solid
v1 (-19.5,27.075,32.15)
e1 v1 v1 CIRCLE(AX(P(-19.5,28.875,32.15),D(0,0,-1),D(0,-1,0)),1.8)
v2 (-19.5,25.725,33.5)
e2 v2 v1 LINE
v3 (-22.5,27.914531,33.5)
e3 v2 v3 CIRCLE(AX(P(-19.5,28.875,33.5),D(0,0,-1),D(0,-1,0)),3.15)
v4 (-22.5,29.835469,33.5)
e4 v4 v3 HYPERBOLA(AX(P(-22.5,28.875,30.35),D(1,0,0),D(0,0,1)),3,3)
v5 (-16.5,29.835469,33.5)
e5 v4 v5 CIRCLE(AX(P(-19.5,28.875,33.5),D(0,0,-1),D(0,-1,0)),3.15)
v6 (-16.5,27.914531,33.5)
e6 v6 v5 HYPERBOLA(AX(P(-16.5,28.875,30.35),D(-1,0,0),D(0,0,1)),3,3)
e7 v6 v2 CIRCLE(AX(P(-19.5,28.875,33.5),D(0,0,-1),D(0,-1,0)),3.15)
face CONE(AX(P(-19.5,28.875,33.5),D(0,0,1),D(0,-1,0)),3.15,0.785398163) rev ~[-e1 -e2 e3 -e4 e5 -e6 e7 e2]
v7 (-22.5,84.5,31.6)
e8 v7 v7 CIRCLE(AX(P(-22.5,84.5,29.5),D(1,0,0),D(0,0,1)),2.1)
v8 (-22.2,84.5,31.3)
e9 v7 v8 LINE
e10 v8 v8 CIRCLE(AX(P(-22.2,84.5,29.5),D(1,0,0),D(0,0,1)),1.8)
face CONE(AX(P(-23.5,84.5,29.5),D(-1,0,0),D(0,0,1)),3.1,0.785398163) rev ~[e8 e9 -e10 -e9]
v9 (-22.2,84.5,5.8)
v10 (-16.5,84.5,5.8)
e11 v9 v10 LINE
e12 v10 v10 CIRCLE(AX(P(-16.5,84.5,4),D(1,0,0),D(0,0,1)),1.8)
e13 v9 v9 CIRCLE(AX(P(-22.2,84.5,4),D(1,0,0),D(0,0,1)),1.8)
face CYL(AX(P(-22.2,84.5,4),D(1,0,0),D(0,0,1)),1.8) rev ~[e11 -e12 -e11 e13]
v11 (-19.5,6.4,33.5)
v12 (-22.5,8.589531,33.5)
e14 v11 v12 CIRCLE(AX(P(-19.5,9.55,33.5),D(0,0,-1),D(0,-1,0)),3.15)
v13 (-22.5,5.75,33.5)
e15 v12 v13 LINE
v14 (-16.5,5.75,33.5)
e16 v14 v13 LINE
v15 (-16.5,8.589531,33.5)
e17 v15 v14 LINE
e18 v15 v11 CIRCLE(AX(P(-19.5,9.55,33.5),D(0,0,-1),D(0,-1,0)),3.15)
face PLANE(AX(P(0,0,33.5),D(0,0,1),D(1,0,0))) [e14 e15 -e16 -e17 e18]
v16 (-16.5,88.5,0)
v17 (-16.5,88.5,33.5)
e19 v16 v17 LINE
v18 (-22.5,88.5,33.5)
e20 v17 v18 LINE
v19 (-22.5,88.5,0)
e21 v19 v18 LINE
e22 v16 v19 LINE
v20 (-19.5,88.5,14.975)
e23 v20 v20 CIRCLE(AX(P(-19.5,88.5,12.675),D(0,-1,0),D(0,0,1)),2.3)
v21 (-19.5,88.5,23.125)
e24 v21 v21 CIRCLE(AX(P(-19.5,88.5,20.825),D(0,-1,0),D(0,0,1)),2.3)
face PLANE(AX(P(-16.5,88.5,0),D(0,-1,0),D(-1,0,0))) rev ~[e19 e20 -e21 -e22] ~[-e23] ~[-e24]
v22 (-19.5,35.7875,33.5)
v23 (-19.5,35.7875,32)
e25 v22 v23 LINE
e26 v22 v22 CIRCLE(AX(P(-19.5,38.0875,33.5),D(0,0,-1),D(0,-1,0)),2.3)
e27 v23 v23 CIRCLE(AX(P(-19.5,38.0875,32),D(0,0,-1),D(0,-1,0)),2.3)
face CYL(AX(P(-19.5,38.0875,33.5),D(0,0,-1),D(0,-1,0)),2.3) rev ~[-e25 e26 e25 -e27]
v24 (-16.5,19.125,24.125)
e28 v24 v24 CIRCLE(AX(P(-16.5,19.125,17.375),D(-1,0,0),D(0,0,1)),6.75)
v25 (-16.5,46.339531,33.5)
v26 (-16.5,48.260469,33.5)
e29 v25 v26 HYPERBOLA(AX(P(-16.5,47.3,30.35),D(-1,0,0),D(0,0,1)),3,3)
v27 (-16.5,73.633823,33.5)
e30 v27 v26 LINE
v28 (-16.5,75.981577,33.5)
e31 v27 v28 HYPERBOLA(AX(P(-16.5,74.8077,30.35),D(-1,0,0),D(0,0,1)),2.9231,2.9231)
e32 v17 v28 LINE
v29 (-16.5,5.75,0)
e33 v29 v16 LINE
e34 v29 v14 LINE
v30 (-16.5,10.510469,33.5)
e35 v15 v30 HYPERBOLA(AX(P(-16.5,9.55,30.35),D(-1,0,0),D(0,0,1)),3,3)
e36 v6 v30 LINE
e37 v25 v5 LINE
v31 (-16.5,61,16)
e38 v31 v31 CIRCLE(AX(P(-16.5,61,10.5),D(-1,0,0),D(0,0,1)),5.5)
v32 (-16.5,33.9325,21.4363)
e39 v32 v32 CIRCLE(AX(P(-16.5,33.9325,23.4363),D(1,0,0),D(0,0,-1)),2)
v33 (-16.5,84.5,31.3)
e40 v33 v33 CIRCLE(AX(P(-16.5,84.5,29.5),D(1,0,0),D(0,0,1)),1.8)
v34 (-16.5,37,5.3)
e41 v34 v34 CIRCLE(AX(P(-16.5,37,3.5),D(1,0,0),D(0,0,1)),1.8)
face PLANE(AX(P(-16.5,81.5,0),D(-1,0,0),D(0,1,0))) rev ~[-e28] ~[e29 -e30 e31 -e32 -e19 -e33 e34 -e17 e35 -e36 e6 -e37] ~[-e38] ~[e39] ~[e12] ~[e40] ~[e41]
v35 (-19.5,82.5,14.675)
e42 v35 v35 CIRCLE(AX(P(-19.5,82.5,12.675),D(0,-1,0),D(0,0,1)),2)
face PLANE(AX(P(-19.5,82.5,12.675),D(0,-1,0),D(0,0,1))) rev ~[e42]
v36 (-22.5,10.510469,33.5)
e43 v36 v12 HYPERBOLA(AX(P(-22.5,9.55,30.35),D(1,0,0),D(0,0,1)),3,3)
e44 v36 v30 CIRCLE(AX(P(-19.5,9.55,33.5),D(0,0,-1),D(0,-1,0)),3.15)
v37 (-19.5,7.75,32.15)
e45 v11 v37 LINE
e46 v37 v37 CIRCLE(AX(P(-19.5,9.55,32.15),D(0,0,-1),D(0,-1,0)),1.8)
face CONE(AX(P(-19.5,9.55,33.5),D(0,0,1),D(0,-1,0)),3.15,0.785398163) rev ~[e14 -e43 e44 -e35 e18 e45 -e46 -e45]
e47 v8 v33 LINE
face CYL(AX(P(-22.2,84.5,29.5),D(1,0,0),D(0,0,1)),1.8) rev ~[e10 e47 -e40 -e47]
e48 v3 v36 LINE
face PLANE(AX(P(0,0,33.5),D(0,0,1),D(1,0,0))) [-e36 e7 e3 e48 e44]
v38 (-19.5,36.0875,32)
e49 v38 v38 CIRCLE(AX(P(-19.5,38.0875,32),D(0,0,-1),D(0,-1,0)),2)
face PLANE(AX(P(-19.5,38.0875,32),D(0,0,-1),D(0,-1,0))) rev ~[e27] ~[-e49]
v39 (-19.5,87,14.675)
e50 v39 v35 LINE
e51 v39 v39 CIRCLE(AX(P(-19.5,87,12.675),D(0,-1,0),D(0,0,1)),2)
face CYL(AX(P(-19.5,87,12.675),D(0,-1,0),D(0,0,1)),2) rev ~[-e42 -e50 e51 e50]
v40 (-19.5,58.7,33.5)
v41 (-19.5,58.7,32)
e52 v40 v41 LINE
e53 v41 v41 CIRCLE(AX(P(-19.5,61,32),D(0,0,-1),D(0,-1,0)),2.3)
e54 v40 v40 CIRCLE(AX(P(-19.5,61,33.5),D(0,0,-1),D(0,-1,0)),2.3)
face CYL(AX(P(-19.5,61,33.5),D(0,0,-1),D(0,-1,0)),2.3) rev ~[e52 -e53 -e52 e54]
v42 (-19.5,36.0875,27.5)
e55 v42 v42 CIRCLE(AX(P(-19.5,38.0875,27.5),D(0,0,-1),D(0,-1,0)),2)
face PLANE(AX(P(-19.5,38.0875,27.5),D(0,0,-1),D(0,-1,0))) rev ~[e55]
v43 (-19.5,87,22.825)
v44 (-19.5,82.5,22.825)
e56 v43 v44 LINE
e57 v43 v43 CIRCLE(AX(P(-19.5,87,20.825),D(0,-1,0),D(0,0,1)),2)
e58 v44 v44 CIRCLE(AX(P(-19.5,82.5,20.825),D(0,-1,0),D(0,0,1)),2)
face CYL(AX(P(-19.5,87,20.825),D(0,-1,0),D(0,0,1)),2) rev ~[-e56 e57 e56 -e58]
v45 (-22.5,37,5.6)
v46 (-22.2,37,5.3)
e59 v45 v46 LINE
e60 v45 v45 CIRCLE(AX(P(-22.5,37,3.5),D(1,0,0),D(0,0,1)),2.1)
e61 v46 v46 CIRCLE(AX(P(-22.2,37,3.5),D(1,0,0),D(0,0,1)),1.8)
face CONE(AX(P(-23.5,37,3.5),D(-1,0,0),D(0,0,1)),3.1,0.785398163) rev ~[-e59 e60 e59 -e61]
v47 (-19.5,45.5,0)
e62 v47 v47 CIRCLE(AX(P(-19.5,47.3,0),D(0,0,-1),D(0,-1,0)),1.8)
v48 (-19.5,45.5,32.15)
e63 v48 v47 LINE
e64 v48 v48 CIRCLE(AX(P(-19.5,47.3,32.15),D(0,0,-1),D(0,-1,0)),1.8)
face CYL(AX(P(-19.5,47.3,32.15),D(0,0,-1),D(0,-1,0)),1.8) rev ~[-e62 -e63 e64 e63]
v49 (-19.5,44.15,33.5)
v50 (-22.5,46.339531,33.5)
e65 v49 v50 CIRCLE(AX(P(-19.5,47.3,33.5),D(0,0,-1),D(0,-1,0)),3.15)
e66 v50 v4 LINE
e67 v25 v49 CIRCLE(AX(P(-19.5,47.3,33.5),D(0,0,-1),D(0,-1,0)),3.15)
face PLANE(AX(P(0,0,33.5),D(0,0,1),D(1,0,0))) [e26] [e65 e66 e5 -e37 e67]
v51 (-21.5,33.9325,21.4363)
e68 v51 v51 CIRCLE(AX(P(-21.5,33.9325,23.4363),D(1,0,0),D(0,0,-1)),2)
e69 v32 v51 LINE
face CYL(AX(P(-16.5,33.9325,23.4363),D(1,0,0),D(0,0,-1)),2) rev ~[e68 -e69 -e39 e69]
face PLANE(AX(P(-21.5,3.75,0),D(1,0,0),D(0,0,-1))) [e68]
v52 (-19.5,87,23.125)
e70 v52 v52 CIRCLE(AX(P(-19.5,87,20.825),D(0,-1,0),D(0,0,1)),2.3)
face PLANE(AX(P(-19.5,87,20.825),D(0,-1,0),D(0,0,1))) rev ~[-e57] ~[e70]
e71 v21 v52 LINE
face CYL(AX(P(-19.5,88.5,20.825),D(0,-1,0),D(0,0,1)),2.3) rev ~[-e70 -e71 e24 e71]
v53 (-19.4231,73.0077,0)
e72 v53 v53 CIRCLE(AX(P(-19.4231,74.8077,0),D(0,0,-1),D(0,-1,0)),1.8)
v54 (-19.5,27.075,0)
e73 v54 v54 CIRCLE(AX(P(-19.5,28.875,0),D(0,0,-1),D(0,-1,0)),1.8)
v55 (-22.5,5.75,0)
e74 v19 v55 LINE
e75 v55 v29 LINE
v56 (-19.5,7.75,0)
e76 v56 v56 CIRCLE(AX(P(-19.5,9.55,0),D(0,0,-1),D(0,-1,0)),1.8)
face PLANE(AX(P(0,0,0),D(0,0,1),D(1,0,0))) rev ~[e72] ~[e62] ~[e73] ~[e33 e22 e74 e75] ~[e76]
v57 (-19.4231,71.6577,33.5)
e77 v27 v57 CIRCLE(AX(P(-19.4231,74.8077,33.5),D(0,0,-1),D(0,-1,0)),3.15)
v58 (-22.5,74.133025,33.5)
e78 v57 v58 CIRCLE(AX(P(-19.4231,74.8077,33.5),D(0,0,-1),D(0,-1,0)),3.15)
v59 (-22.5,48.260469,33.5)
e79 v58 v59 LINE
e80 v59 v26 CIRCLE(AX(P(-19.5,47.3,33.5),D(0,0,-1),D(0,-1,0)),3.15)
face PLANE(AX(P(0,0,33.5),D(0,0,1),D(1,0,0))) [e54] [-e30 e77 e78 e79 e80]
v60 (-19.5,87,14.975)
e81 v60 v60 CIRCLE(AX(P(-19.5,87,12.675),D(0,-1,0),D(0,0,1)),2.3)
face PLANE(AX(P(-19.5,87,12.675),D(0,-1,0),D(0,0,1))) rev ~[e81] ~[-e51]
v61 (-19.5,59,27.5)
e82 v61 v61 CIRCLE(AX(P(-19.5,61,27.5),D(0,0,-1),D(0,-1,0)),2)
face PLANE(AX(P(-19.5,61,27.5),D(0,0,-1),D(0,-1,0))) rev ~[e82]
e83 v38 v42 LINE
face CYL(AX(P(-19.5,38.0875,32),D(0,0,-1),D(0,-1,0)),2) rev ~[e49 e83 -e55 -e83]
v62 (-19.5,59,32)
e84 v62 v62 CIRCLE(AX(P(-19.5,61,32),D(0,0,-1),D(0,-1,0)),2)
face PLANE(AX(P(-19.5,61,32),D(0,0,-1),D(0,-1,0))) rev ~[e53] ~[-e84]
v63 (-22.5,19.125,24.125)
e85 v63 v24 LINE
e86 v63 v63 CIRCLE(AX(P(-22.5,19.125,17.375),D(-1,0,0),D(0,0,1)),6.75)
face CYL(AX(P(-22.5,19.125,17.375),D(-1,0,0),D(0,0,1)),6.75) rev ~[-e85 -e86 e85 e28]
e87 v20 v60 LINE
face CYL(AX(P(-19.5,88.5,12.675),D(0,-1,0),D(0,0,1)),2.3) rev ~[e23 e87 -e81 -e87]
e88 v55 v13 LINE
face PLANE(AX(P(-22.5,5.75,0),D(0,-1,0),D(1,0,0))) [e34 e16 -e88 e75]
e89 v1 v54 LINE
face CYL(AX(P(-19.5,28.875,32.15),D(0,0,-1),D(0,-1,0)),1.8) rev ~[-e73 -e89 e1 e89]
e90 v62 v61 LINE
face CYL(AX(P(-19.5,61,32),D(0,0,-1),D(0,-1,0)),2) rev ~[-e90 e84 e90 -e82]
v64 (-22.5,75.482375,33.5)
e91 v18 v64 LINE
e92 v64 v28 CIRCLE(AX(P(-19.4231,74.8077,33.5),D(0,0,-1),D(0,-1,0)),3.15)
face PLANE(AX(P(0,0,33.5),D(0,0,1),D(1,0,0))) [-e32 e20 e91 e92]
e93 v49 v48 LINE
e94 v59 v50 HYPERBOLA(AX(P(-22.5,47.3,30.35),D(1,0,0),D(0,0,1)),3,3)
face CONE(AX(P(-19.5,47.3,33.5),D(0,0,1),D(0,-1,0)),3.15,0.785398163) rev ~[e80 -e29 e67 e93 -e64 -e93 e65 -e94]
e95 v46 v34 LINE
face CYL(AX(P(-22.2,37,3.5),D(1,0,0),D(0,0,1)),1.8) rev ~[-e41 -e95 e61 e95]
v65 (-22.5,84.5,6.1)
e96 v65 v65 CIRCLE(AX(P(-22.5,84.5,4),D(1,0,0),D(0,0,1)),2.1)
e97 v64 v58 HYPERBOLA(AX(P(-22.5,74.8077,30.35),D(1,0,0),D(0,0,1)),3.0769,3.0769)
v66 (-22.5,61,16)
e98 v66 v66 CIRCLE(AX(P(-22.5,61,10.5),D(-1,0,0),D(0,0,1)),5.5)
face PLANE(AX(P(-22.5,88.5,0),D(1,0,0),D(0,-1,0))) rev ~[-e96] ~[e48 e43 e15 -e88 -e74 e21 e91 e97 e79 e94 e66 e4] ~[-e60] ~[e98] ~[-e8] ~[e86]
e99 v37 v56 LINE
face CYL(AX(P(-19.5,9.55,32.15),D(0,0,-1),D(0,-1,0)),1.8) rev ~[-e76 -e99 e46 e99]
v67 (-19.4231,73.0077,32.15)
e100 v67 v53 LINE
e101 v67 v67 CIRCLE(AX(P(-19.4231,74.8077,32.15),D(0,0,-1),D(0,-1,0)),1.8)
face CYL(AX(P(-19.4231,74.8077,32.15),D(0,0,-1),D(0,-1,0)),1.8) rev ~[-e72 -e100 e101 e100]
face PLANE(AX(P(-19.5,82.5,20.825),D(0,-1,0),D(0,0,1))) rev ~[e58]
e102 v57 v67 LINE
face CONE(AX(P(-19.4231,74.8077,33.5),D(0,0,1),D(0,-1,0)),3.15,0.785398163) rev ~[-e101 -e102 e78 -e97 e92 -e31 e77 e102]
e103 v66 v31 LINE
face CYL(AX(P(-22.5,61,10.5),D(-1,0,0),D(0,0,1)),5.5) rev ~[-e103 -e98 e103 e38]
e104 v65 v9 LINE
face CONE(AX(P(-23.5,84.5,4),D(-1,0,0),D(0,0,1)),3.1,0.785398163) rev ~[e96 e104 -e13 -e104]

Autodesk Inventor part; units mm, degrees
ref_plane "YZ Plane" through (0, 0, 0) normal (1, 0, 0) x (0, 1, 0)
ref_plane "XZ Plane" through (0, 0, 0) normal (0, 1, 0) x (-1, 0, 0)
ref_plane "Work Plane1" through (0, 0, 0) normal (0, 0, 1) x (1, 0, 0)
sketch "Sketch1" plane through (0, 0, 0) normal (0, 0, 1) x (1, 0, 0)
  line L0 (23.5, 88.5) -> (-23.5, 88.5) projected
  line L1 (-23.5, 88.5) -> (-23.5, 36.5) projected
  line L2 (-26.5, 33.5) -> (-89, 33.5) projected
  line L3 (-89, 33.5) -> (-89, -72.5) projected
  line L4 (-89, -72.5) -> (-77, -72.5) projected
  line L5 (-74, -75.5) -> (-74, -93.5) projected
  line L6 (-74, -93.5) -> (74, -93.5) projected
  line L7 (74, -93.5) -> (74, -75.5) projected
  line L8 (77, -72.5) -> (89, -72.5) projected
  line L9 (89, -72.5) -> (89, 33.5) projected
  line L10 (89, 33.5) -> (26.5, 33.5) projected
  line L11 (23.5, 36.5) -> (23.5, 88.5) projected
  line L12 (-4.5, 81.5) -> (-4.5, 36.5) projected
  line L13 (-7.5, 33.5) -> (-13.5, 33.5) projected
  line L14 (-16.5, 36.5) -> (-16.5, 81.5) projected
  line L15 (-13.5, 84.5) -> (-7.5, 84.5) projected
  line L16 (16.5, 81.5) -> (16.5, 36.5) projected
  line L17 (13.5, 33.5) -> (7.5, 33.5) projected
  line L18 (4.5, 36.5) -> (4.5, 81.5) projected
  line L19 (7.5, 84.5) -> (13.5, 84.5) projected
  line L20 (-16.5, 88.5) -> (-22.5, 88.5)
  line L21 (-22.5, 88.5) -> (-22.5, 3.75)
  line L22 (-22.5, 3.75) -> (-16.5, 3.75)
  line L23 (-16.5, 3.75) -> (-16.5, 88.5)
  line L24 (-32.2, 4.75) -> (-59.9, 4.75)
  arc A0 (13.5, 33.5) -> (16.5, 36.5) centre (13.5, 36.5) ccw projected
  arc A1 (4.5, 36.5) -> (7.5, 33.5) centre (7.5, 36.5) ccw projected
  arc A2 (7.5, 84.5) -> (4.5, 81.5) centre (7.5, 81.5) ccw projected
  arc A3 (16.5, 81.5) -> (13.5, 84.5) centre (13.5, 81.5) ccw projected
  arc A4 (-4.5, 81.5) -> (-7.5, 84.5) centre (-7.5, 81.5) ccw projected
  arc A5 (-7.5, 33.5) -> (-4.5, 36.5) centre (-7.5, 36.5) ccw projected
  arc A6 (-16.5, 36.5) -> (-13.5, 33.5) centre (-13.5, 36.5) ccw projected
  arc A7 (-13.5, 84.5) -> (-16.5, 81.5) centre (-13.5, 81.5) ccw projected
  arc A8 (-26.5, 33.5) -> (-23.5, 36.5) centre (-26.5, 36.5) ccw projected
  arc A9 (-74, -75.5) -> (-77, -72.5) centre (-77, -75.5) ccw projected
  arc A10 (77, -72.5) -> (74, -75.5) centre (77, -75.5) ccw projected
  arc A11 (23.5, 36.5) -> (26.5, 33.5) centre (26.5, 36.5) ccw projected
  point P0 (0, 0)
  point P1 (-16.5, 36.5)
  point P2 (-16.5, 81.5)
  dimension "d0" = 1
  dimension "d2" = 1
ref_plane "Work Plane2" through (-89, -40.3889, 33.5) normal (0, 0, 1) x (1, 0, 0)
extrude "Extrusion1" add sketch "Sketch1" along normal up to surface (33.5 mm away) contours L23 L14 L22 L21 L0
sketch "Sketch2" plane through (-22.5, 3.75, 0) normal (-1, 0, 0) x (0, 0, 1)
  arc A0 (15.7043, 9.7757) -> (16.863, 11.545) centre (12.3771, 13.2188) ccw projected
  arc A1 (16.863, 11.545) -> (17.4685, 11.512) centre (17.375, 15.375) ccw projected
  arc A2 (17.4685, 11.512) -> (18.4285, 9.6275) centre (22.1095, 12.6893) ccw projected
  arc A3 (18.4285, 9.6275) -> (19.3146, 9.863) centre (17.375, 15.375) ccw projected
  arc A4 (19.3146, 9.863) -> (19.2121, 11.9755) centre (14.599, 10.6929) ccw projected
  arc A5 (19.2121, 11.9755) -> (19.7212, 12.3047) centre (17.375, 15.375) ccw projected
  arc A6 (19.7212, 12.3047) -> (21.6056, 11.3444) centre (22.7839, 15.9851) ccw projected
  arc A7 (21.6056, 11.3444) -> (22.184, 12.0558) centre (17.375, 15.375) ccw projected
  arc A8 (22.184, 12.0558) -> (20.8594, 13.7045) centre (17.8813, 9.9554) ccw projected
  arc A9 (20.8594, 13.7045) -> (21.0778, 14.2702) centre (17.375, 15.375) ccw projected
  arc A10 (21.0778, 14.2702) -> (23.1668, 14.6008) centre (21.3923, 19.0479) ccw projected
  arc A11 (23.1668, 14.6008) -> (23.2166, 15.5164) centre (17.375, 15.375) ccw projected
  arc A12 (23.2166, 15.5164) -> (21.1758, 16.0716) centre (20.9701, 11.288) ccw projected
  arc A13 (21.1758, 16.0716) -> (21.02, 16.6576) centre (17.375, 15.375) ccw projected
  arc A14 (21.02, 16.6576) -> (22.5157, 18.153) centre (18.4662, 20.7077) ccw projected
  arc A15 (22.5157, 18.153) -> (22.0178, 18.923) centre (17.375, 15.375) ccw projected
  arc A16 (22.0178, 18.923) -> (20.0404, 18.1726) centre (22.6858, 14.1817) ccw projected
  arc A17 (20.0404, 18.1726) -> (19.57, 18.5552) centre (17.375, 15.375) ccw projected
  arc A18 (19.57, 18.5552) -> (19.9011, 20.644) centre (15.1233, 20.3306) ccw projected
  arc A19 (19.9011, 20.644) -> (19.0457, 20.9743) centre (17.375, 15.375) ccw projected
  arc A20 (19.0457, 20.9743) -> (17.887, 19.205) centre (22.3729, 17.5312) ccw projected
  arc A21 (17.887, 19.205) -> (17.2815, 19.238) centre (17.375, 15.375) ccw projected
  arc A22 (17.2815, 19.238) -> (16.3215, 21.1225) centre (12.6405, 18.0607) ccw projected
  arc A23 (16.3215, 21.1225) -> (15.4354, 20.887) centre (17.375, 15.375) ccw projected
  arc A24 (15.4354, 20.887) -> (15.5379, 18.7745) centre (20.151, 20.0571) ccw projected
  arc A25 (15.5379, 18.7745) -> (15.0288, 18.4453) centre (17.375, 15.375) ccw projected
  arc A26 (15.0288, 18.4453) -> (13.1444, 19.4056) centre (11.9661, 14.7649) ccw projected
  arc A27 (13.1444, 19.4056) -> (12.566, 18.6942) centre (17.375, 15.375) ccw projected
  arc A28 (12.566, 18.6942) -> (13.8906, 17.0455) centre (16.8687, 20.7946) ccw projected
  arc A29 (13.8906, 17.0455) -> (13.6722, 16.4798) centre (17.375, 15.375) ccw projected
  arc A30 (13.6722, 16.4798) -> (11.5832, 16.1492) centre (13.3577, 11.7021) ccw projected
  arc A31 (11.5832, 16.1492) -> (11.5334, 15.2336) centre (17.375, 15.375) ccw projected
  arc A32 (11.5334, 15.2336) -> (13.5742, 14.6784) centre (13.7799, 19.462) ccw projected
  arc A33 (13.5742, 14.6784) -> (13.73, 14.0924) centre (17.375, 15.375) ccw projected
  arc A34 (13.73, 14.0924) -> (12.2343, 12.597) centre (16.2838, 10.0423) ccw projected
  arc A35 (12.2343, 12.597) -> (12.7322, 11.827) centre (17.375, 15.375) ccw projected
  arc A36 (12.7322, 11.827) -> (14.7096, 12.5774) centre (12.0642, 16.5683) ccw projected
  arc A37 (14.7096, 12.5774) -> (15.18, 12.1948) centre (17.375, 15.375) ccw projected
  arc A38 (15.18, 12.1948) -> (14.8489, 10.106) centre (19.6267, 10.4194) ccw projected
  arc A39 (14.8489, 10.106) -> (15.7043, 9.7757) centre (17.375, 15.375) ccw projected
  circle A40 centre (17.375, 15.375) radius 6.75
  circle A41 centre (17.375, 15.375) radius 5.8433
  line L0 (23.2183, 15.375) -> (24.125, 15.375)
  circle A42 centre (10.5, 57.25) radius 5.5 projected
  point P0 (0, -3.75)
  dimension "d6" = 13.5
  dimension "d5" = 0.9067
  dimension "d9" = 11
extrude "Extrusion2" cut sketch "Sketch2" against normal up to next contours A39 A38 A37 A36 A35 A34 A33 A32 A31 A30 A29 A28 A27 A26 A25 A24 A23 A22 A21 A20 A19 A18 A17 A16 A15 A14 A13 A12 A11 A10 A9 A8 A7 A6 A5 A4 A3 A2 A1 A0 | A0 A1 A2 A41 | A41 A36 A37 A38 | A4 A5 A6 A41 | A41 A32 A33 A34 | A8 A9 A10 A41 | A41 A28 A29 A30 | A41 A24 A25 A26 | A12 A13 A14 A41 | A41 A20 A21 A22 | A16 A17 A18 A41 | A40 | A42
sketch "Sketch3" plane through (-16.5, 3.75, 0) normal (1, 0, 0) x (0, 0, -1)
  circle A0 centre (-23.4363, 30.1825) radius 2 projected
  point P0 (0, -3.75)
extrude "Extrusion3" cut sketch "Sketch3" against normal blind 5
ref_plane "Work Plane3" through (-23.5, 3.75, 0) normal (-1, 0, 0) x (0, 0, 1)
sketch "Sketch5" plane through (-23.5, 3.75, 0) normal (-1, 0, 0) x (0, 0, 1)
  circle A0 centre (29.5, 80.75) radius 2.1 projected
  circle A1 centre (4, 80.75) radius 2.1 projected
  circle A2 centre (3.5, 33.25) radius 2.1 projected
  point P0 (0, -3.75)
hole "Hole1" at (-23.5, 84.5, 29.5) at (-23.5, 84.5, 4) at (-23.5, 37, 3.5) direction (1, 0, 0) diameter 3.6 end through all countersink diameter 6.2 countersink angle 90 clearance for "Countersunk Flat Head Screw ISO 2009/7046" size "M3" standard "ISO"
sketch "Sketch6" plane through (-22.5, 3.75, 33.5) normal (0, 0, 1) x (1, 0, 0)
  line L0 (0, 8.625) -> (0, 22.125) projected
  line L1 (1, 32.1825) -> (1, 28.1825) projected
  line L2 (0, 31.15) -> (0, 35.35) projected
  line L3 (0, 51.75) -> (0, 62.75) projected
  line L4 (0, 78.65) -> (0, 82.85) projected
  line L5 (0, 78.65) -> (0, 82.85) projected
  line L6 (6, 0) -> (0, 0) projected
  line L7 (6, 84.75) -> (6, 0) projected
  line L8 (0, 84.75) -> (6, 84.75) projected
  line L9 (0, 0) -> (0, 84.75) projected
  line L10 (6, 28.125) -> (0, 28.125)
  line L11 (0, 28.125) -> (0, 35.35)
  line L12 (0, 35.35) -> (6, 35.35)
  line L13 (6, 35.35) -> (6, 28.125)
  line L14 (0, 8.625) -> (6, 8.625) projected
  line L15 (6, 8.625) -> (0, 8.625)
  line L16 (0, 8.625) -> (0, 22.125)
  line L17 (0, 22.125) -> (6, 22.125)
  line L18 (6, 22.125) -> (6, 8.625)
  line L19 (6, 78.95) -> (0.3, 78.95) projected
  line L20 (6, 84.75) -> (0, 84.75) projected
  line L21 (6, 78.95) -> (0, 78.95)
  line L22 (0, 78.95) -> (0, 84.75)
  line L23 (0, 84.75) -> (6, 84.75)
  line L24 (6, 84.75) -> (6, 78.95)
  line L25 (0, 51.75) -> (6, 51.75) projected
  line L26 (0, 51.75) -> (0, 62.75) projected
  line L27 (6, 51.75) -> (0, 51.75)
  line L28 (0, 51.75) -> (0, 62.75)
  line L29 (0, 62.75) -> (6, 62.75)
  line L30 (6, 62.75) -> (6, 51.75)
  line L31 (6, 0) -> (0, 0)
  line L32 (0, 0) -> (0, 4)
  line L33 (0, 4) -> (6, 4)
  line L34 (6, 4) -> (6, 0)
  circle A0 centre (3, 5.8) radius 1.8
  line L35 (6, 22.125) -> (0, 28.125)
  line L36 (0, 22.125) -> (6, 28.125)
  line L37 (6, 35.35) -> (0, 51.75)
  line L38 (0, 35.35) -> (6, 51.75)
  line L39 (0.3, 82.55) -> (0.3, 78.95) projected
  line L40 (6, 62.75) -> (0.3, 78.95)
  line L41 (6, 82.55) -> (6, 78.95) projected
  line L42 (0.3, 78.95) -> (6, 78.95)
  line L43 (6, 78.95) -> (0, 62.75)
  point P0 (22.5, -3.75)
  point P1 (3, 25.125)
  point P2 (3.0769, 71.0577)
  point P3 (3, 43.55)
  dimension "d20" = 4
  dimension "d21" = 3.6
  dimension "d22" = 3
  dimension "d23" = 3
hole "Hole2" at (-19.5, 28.875, 33.5) at (-19.5, 9.55, 33.5) at (-19.4231, 74.8077, 33.5) at (-19.5, 47.3, 33.5) direction (0, 0, -1) diameter 3.6 end through all countersink diameter 6.3 countersink angle 90 clearance for "Countersunk Flat Head Screw ISO 2009/7046" size "M3" standard "ISO"
sketch "Sketch9" plane through (-22.5, 88.5, 0) normal (0, 1, 0) x (1, 0, 0)
  circle A0 centre (22.5, -20.825) radius 2.3 projected
  circle A1 centre (22.5, -12.675) radius 2.3 projected
  line L0 (18, -33.5) -> (27, -33.5) projected
  line L1 (27, 0) -> (27, -33.5) projected
  line L2 (27, 0) -> (18, 0) projected
  line L3 (18, 0) -> (18, -33.5) projected
  line L4 (22.5, -20.825) -> (0, -20.825)
  line L5 (0, -24.125) -> (0, -10.625) projected
  line L6 (22.5, -12.675) -> (0, -12.675)
  line L7 (6, 0) -> (6, -33.5) projected
  point P0 (22.5, 0)
  point P1 (3, -20.825)
  point P2 (3, -12.675)
  dimension "d45" = 3
  dimension "d46" = 3
  dimension "d47" = 3
  dimension "d48" = 3
hole "Hole5" at (-19.5, 88.5, 20.825) at (-19.5, 88.5, 12.675) direction (0, -1, 0) diameter 4 depth 6 counterbore diameter 4.6 counterbore depth 1.5
sketch "Sketch10" plane through (-19.5, 47.3, 33.5) normal (0, 0, 1) x (1, 0, 0)
  line L0 (-3, 8.2) -> (-3, 19.2) projected
  arc A0 (3, -17.4645) -> (-3, -17.4645) centre (0, -18.425) ccw projected
  arc A1 (-3, -0.9605) -> (3, -0.9605) centre (0, 0) ccw projected
  arc A2 (3, -17.4645) -> (-3, -17.4645) centre (0, -18.425) ccw projected
  line L1 (3, -0.9605) -> (3, -17.4645) projected
  arc A3 (-3, -0.9605) -> (3, -0.9605) centre (0, 0) ccw projected
  line L2 (-3, -17.4645) -> (-3, -0.9605) projected
  line L3 (3, 8.2) -> (-3, 8.2)
  line L4 (3, 19.2) -> (-3, 19.2)
  line L5 (-3, 19.2) -> (3, 8.2)
  line L6 (-3, 8.2) -> (3, 19.2)
  line L7 (3, -17.4645) -> (-3, -0.9605)
  line L8 (-3, -17.4645) -> (3, -0.9605)
  point P0 (19.5, -47.3)
  point P1 (0, -9.2125)
  point P2 (0, 13.7)
hole "Hole6" at (-19.5, 38.0875, 33.5) at (-19.5, 61, 33.5) direction (0, 0, -1) diameter 4 depth 6 counterbore diameter 4.6 counterbore depth 1.5
sketch "Sketch11" plane through (-22.5, 3.75, 0) normal (0, -1, 0) x (1, 0, 0)
  line L0 (6, 33.5) -> (0, 33.5) projected
  line L1 (0, 0) -> (0, 33.5) projected
  line L2 (0, 0) -> (6, 0) projected
  line L3 (6, 0) -> (6, 33.5) projected
  point P0 (22.5, 0)
extrude "Extrusion4" cut sketch "Sketch11" against normal blind 2
equation "\"d22\" = d23"
equation "\"d45\" = d46"
equation "\"d47\" = d48"
properties part number "right_gear_holder"
